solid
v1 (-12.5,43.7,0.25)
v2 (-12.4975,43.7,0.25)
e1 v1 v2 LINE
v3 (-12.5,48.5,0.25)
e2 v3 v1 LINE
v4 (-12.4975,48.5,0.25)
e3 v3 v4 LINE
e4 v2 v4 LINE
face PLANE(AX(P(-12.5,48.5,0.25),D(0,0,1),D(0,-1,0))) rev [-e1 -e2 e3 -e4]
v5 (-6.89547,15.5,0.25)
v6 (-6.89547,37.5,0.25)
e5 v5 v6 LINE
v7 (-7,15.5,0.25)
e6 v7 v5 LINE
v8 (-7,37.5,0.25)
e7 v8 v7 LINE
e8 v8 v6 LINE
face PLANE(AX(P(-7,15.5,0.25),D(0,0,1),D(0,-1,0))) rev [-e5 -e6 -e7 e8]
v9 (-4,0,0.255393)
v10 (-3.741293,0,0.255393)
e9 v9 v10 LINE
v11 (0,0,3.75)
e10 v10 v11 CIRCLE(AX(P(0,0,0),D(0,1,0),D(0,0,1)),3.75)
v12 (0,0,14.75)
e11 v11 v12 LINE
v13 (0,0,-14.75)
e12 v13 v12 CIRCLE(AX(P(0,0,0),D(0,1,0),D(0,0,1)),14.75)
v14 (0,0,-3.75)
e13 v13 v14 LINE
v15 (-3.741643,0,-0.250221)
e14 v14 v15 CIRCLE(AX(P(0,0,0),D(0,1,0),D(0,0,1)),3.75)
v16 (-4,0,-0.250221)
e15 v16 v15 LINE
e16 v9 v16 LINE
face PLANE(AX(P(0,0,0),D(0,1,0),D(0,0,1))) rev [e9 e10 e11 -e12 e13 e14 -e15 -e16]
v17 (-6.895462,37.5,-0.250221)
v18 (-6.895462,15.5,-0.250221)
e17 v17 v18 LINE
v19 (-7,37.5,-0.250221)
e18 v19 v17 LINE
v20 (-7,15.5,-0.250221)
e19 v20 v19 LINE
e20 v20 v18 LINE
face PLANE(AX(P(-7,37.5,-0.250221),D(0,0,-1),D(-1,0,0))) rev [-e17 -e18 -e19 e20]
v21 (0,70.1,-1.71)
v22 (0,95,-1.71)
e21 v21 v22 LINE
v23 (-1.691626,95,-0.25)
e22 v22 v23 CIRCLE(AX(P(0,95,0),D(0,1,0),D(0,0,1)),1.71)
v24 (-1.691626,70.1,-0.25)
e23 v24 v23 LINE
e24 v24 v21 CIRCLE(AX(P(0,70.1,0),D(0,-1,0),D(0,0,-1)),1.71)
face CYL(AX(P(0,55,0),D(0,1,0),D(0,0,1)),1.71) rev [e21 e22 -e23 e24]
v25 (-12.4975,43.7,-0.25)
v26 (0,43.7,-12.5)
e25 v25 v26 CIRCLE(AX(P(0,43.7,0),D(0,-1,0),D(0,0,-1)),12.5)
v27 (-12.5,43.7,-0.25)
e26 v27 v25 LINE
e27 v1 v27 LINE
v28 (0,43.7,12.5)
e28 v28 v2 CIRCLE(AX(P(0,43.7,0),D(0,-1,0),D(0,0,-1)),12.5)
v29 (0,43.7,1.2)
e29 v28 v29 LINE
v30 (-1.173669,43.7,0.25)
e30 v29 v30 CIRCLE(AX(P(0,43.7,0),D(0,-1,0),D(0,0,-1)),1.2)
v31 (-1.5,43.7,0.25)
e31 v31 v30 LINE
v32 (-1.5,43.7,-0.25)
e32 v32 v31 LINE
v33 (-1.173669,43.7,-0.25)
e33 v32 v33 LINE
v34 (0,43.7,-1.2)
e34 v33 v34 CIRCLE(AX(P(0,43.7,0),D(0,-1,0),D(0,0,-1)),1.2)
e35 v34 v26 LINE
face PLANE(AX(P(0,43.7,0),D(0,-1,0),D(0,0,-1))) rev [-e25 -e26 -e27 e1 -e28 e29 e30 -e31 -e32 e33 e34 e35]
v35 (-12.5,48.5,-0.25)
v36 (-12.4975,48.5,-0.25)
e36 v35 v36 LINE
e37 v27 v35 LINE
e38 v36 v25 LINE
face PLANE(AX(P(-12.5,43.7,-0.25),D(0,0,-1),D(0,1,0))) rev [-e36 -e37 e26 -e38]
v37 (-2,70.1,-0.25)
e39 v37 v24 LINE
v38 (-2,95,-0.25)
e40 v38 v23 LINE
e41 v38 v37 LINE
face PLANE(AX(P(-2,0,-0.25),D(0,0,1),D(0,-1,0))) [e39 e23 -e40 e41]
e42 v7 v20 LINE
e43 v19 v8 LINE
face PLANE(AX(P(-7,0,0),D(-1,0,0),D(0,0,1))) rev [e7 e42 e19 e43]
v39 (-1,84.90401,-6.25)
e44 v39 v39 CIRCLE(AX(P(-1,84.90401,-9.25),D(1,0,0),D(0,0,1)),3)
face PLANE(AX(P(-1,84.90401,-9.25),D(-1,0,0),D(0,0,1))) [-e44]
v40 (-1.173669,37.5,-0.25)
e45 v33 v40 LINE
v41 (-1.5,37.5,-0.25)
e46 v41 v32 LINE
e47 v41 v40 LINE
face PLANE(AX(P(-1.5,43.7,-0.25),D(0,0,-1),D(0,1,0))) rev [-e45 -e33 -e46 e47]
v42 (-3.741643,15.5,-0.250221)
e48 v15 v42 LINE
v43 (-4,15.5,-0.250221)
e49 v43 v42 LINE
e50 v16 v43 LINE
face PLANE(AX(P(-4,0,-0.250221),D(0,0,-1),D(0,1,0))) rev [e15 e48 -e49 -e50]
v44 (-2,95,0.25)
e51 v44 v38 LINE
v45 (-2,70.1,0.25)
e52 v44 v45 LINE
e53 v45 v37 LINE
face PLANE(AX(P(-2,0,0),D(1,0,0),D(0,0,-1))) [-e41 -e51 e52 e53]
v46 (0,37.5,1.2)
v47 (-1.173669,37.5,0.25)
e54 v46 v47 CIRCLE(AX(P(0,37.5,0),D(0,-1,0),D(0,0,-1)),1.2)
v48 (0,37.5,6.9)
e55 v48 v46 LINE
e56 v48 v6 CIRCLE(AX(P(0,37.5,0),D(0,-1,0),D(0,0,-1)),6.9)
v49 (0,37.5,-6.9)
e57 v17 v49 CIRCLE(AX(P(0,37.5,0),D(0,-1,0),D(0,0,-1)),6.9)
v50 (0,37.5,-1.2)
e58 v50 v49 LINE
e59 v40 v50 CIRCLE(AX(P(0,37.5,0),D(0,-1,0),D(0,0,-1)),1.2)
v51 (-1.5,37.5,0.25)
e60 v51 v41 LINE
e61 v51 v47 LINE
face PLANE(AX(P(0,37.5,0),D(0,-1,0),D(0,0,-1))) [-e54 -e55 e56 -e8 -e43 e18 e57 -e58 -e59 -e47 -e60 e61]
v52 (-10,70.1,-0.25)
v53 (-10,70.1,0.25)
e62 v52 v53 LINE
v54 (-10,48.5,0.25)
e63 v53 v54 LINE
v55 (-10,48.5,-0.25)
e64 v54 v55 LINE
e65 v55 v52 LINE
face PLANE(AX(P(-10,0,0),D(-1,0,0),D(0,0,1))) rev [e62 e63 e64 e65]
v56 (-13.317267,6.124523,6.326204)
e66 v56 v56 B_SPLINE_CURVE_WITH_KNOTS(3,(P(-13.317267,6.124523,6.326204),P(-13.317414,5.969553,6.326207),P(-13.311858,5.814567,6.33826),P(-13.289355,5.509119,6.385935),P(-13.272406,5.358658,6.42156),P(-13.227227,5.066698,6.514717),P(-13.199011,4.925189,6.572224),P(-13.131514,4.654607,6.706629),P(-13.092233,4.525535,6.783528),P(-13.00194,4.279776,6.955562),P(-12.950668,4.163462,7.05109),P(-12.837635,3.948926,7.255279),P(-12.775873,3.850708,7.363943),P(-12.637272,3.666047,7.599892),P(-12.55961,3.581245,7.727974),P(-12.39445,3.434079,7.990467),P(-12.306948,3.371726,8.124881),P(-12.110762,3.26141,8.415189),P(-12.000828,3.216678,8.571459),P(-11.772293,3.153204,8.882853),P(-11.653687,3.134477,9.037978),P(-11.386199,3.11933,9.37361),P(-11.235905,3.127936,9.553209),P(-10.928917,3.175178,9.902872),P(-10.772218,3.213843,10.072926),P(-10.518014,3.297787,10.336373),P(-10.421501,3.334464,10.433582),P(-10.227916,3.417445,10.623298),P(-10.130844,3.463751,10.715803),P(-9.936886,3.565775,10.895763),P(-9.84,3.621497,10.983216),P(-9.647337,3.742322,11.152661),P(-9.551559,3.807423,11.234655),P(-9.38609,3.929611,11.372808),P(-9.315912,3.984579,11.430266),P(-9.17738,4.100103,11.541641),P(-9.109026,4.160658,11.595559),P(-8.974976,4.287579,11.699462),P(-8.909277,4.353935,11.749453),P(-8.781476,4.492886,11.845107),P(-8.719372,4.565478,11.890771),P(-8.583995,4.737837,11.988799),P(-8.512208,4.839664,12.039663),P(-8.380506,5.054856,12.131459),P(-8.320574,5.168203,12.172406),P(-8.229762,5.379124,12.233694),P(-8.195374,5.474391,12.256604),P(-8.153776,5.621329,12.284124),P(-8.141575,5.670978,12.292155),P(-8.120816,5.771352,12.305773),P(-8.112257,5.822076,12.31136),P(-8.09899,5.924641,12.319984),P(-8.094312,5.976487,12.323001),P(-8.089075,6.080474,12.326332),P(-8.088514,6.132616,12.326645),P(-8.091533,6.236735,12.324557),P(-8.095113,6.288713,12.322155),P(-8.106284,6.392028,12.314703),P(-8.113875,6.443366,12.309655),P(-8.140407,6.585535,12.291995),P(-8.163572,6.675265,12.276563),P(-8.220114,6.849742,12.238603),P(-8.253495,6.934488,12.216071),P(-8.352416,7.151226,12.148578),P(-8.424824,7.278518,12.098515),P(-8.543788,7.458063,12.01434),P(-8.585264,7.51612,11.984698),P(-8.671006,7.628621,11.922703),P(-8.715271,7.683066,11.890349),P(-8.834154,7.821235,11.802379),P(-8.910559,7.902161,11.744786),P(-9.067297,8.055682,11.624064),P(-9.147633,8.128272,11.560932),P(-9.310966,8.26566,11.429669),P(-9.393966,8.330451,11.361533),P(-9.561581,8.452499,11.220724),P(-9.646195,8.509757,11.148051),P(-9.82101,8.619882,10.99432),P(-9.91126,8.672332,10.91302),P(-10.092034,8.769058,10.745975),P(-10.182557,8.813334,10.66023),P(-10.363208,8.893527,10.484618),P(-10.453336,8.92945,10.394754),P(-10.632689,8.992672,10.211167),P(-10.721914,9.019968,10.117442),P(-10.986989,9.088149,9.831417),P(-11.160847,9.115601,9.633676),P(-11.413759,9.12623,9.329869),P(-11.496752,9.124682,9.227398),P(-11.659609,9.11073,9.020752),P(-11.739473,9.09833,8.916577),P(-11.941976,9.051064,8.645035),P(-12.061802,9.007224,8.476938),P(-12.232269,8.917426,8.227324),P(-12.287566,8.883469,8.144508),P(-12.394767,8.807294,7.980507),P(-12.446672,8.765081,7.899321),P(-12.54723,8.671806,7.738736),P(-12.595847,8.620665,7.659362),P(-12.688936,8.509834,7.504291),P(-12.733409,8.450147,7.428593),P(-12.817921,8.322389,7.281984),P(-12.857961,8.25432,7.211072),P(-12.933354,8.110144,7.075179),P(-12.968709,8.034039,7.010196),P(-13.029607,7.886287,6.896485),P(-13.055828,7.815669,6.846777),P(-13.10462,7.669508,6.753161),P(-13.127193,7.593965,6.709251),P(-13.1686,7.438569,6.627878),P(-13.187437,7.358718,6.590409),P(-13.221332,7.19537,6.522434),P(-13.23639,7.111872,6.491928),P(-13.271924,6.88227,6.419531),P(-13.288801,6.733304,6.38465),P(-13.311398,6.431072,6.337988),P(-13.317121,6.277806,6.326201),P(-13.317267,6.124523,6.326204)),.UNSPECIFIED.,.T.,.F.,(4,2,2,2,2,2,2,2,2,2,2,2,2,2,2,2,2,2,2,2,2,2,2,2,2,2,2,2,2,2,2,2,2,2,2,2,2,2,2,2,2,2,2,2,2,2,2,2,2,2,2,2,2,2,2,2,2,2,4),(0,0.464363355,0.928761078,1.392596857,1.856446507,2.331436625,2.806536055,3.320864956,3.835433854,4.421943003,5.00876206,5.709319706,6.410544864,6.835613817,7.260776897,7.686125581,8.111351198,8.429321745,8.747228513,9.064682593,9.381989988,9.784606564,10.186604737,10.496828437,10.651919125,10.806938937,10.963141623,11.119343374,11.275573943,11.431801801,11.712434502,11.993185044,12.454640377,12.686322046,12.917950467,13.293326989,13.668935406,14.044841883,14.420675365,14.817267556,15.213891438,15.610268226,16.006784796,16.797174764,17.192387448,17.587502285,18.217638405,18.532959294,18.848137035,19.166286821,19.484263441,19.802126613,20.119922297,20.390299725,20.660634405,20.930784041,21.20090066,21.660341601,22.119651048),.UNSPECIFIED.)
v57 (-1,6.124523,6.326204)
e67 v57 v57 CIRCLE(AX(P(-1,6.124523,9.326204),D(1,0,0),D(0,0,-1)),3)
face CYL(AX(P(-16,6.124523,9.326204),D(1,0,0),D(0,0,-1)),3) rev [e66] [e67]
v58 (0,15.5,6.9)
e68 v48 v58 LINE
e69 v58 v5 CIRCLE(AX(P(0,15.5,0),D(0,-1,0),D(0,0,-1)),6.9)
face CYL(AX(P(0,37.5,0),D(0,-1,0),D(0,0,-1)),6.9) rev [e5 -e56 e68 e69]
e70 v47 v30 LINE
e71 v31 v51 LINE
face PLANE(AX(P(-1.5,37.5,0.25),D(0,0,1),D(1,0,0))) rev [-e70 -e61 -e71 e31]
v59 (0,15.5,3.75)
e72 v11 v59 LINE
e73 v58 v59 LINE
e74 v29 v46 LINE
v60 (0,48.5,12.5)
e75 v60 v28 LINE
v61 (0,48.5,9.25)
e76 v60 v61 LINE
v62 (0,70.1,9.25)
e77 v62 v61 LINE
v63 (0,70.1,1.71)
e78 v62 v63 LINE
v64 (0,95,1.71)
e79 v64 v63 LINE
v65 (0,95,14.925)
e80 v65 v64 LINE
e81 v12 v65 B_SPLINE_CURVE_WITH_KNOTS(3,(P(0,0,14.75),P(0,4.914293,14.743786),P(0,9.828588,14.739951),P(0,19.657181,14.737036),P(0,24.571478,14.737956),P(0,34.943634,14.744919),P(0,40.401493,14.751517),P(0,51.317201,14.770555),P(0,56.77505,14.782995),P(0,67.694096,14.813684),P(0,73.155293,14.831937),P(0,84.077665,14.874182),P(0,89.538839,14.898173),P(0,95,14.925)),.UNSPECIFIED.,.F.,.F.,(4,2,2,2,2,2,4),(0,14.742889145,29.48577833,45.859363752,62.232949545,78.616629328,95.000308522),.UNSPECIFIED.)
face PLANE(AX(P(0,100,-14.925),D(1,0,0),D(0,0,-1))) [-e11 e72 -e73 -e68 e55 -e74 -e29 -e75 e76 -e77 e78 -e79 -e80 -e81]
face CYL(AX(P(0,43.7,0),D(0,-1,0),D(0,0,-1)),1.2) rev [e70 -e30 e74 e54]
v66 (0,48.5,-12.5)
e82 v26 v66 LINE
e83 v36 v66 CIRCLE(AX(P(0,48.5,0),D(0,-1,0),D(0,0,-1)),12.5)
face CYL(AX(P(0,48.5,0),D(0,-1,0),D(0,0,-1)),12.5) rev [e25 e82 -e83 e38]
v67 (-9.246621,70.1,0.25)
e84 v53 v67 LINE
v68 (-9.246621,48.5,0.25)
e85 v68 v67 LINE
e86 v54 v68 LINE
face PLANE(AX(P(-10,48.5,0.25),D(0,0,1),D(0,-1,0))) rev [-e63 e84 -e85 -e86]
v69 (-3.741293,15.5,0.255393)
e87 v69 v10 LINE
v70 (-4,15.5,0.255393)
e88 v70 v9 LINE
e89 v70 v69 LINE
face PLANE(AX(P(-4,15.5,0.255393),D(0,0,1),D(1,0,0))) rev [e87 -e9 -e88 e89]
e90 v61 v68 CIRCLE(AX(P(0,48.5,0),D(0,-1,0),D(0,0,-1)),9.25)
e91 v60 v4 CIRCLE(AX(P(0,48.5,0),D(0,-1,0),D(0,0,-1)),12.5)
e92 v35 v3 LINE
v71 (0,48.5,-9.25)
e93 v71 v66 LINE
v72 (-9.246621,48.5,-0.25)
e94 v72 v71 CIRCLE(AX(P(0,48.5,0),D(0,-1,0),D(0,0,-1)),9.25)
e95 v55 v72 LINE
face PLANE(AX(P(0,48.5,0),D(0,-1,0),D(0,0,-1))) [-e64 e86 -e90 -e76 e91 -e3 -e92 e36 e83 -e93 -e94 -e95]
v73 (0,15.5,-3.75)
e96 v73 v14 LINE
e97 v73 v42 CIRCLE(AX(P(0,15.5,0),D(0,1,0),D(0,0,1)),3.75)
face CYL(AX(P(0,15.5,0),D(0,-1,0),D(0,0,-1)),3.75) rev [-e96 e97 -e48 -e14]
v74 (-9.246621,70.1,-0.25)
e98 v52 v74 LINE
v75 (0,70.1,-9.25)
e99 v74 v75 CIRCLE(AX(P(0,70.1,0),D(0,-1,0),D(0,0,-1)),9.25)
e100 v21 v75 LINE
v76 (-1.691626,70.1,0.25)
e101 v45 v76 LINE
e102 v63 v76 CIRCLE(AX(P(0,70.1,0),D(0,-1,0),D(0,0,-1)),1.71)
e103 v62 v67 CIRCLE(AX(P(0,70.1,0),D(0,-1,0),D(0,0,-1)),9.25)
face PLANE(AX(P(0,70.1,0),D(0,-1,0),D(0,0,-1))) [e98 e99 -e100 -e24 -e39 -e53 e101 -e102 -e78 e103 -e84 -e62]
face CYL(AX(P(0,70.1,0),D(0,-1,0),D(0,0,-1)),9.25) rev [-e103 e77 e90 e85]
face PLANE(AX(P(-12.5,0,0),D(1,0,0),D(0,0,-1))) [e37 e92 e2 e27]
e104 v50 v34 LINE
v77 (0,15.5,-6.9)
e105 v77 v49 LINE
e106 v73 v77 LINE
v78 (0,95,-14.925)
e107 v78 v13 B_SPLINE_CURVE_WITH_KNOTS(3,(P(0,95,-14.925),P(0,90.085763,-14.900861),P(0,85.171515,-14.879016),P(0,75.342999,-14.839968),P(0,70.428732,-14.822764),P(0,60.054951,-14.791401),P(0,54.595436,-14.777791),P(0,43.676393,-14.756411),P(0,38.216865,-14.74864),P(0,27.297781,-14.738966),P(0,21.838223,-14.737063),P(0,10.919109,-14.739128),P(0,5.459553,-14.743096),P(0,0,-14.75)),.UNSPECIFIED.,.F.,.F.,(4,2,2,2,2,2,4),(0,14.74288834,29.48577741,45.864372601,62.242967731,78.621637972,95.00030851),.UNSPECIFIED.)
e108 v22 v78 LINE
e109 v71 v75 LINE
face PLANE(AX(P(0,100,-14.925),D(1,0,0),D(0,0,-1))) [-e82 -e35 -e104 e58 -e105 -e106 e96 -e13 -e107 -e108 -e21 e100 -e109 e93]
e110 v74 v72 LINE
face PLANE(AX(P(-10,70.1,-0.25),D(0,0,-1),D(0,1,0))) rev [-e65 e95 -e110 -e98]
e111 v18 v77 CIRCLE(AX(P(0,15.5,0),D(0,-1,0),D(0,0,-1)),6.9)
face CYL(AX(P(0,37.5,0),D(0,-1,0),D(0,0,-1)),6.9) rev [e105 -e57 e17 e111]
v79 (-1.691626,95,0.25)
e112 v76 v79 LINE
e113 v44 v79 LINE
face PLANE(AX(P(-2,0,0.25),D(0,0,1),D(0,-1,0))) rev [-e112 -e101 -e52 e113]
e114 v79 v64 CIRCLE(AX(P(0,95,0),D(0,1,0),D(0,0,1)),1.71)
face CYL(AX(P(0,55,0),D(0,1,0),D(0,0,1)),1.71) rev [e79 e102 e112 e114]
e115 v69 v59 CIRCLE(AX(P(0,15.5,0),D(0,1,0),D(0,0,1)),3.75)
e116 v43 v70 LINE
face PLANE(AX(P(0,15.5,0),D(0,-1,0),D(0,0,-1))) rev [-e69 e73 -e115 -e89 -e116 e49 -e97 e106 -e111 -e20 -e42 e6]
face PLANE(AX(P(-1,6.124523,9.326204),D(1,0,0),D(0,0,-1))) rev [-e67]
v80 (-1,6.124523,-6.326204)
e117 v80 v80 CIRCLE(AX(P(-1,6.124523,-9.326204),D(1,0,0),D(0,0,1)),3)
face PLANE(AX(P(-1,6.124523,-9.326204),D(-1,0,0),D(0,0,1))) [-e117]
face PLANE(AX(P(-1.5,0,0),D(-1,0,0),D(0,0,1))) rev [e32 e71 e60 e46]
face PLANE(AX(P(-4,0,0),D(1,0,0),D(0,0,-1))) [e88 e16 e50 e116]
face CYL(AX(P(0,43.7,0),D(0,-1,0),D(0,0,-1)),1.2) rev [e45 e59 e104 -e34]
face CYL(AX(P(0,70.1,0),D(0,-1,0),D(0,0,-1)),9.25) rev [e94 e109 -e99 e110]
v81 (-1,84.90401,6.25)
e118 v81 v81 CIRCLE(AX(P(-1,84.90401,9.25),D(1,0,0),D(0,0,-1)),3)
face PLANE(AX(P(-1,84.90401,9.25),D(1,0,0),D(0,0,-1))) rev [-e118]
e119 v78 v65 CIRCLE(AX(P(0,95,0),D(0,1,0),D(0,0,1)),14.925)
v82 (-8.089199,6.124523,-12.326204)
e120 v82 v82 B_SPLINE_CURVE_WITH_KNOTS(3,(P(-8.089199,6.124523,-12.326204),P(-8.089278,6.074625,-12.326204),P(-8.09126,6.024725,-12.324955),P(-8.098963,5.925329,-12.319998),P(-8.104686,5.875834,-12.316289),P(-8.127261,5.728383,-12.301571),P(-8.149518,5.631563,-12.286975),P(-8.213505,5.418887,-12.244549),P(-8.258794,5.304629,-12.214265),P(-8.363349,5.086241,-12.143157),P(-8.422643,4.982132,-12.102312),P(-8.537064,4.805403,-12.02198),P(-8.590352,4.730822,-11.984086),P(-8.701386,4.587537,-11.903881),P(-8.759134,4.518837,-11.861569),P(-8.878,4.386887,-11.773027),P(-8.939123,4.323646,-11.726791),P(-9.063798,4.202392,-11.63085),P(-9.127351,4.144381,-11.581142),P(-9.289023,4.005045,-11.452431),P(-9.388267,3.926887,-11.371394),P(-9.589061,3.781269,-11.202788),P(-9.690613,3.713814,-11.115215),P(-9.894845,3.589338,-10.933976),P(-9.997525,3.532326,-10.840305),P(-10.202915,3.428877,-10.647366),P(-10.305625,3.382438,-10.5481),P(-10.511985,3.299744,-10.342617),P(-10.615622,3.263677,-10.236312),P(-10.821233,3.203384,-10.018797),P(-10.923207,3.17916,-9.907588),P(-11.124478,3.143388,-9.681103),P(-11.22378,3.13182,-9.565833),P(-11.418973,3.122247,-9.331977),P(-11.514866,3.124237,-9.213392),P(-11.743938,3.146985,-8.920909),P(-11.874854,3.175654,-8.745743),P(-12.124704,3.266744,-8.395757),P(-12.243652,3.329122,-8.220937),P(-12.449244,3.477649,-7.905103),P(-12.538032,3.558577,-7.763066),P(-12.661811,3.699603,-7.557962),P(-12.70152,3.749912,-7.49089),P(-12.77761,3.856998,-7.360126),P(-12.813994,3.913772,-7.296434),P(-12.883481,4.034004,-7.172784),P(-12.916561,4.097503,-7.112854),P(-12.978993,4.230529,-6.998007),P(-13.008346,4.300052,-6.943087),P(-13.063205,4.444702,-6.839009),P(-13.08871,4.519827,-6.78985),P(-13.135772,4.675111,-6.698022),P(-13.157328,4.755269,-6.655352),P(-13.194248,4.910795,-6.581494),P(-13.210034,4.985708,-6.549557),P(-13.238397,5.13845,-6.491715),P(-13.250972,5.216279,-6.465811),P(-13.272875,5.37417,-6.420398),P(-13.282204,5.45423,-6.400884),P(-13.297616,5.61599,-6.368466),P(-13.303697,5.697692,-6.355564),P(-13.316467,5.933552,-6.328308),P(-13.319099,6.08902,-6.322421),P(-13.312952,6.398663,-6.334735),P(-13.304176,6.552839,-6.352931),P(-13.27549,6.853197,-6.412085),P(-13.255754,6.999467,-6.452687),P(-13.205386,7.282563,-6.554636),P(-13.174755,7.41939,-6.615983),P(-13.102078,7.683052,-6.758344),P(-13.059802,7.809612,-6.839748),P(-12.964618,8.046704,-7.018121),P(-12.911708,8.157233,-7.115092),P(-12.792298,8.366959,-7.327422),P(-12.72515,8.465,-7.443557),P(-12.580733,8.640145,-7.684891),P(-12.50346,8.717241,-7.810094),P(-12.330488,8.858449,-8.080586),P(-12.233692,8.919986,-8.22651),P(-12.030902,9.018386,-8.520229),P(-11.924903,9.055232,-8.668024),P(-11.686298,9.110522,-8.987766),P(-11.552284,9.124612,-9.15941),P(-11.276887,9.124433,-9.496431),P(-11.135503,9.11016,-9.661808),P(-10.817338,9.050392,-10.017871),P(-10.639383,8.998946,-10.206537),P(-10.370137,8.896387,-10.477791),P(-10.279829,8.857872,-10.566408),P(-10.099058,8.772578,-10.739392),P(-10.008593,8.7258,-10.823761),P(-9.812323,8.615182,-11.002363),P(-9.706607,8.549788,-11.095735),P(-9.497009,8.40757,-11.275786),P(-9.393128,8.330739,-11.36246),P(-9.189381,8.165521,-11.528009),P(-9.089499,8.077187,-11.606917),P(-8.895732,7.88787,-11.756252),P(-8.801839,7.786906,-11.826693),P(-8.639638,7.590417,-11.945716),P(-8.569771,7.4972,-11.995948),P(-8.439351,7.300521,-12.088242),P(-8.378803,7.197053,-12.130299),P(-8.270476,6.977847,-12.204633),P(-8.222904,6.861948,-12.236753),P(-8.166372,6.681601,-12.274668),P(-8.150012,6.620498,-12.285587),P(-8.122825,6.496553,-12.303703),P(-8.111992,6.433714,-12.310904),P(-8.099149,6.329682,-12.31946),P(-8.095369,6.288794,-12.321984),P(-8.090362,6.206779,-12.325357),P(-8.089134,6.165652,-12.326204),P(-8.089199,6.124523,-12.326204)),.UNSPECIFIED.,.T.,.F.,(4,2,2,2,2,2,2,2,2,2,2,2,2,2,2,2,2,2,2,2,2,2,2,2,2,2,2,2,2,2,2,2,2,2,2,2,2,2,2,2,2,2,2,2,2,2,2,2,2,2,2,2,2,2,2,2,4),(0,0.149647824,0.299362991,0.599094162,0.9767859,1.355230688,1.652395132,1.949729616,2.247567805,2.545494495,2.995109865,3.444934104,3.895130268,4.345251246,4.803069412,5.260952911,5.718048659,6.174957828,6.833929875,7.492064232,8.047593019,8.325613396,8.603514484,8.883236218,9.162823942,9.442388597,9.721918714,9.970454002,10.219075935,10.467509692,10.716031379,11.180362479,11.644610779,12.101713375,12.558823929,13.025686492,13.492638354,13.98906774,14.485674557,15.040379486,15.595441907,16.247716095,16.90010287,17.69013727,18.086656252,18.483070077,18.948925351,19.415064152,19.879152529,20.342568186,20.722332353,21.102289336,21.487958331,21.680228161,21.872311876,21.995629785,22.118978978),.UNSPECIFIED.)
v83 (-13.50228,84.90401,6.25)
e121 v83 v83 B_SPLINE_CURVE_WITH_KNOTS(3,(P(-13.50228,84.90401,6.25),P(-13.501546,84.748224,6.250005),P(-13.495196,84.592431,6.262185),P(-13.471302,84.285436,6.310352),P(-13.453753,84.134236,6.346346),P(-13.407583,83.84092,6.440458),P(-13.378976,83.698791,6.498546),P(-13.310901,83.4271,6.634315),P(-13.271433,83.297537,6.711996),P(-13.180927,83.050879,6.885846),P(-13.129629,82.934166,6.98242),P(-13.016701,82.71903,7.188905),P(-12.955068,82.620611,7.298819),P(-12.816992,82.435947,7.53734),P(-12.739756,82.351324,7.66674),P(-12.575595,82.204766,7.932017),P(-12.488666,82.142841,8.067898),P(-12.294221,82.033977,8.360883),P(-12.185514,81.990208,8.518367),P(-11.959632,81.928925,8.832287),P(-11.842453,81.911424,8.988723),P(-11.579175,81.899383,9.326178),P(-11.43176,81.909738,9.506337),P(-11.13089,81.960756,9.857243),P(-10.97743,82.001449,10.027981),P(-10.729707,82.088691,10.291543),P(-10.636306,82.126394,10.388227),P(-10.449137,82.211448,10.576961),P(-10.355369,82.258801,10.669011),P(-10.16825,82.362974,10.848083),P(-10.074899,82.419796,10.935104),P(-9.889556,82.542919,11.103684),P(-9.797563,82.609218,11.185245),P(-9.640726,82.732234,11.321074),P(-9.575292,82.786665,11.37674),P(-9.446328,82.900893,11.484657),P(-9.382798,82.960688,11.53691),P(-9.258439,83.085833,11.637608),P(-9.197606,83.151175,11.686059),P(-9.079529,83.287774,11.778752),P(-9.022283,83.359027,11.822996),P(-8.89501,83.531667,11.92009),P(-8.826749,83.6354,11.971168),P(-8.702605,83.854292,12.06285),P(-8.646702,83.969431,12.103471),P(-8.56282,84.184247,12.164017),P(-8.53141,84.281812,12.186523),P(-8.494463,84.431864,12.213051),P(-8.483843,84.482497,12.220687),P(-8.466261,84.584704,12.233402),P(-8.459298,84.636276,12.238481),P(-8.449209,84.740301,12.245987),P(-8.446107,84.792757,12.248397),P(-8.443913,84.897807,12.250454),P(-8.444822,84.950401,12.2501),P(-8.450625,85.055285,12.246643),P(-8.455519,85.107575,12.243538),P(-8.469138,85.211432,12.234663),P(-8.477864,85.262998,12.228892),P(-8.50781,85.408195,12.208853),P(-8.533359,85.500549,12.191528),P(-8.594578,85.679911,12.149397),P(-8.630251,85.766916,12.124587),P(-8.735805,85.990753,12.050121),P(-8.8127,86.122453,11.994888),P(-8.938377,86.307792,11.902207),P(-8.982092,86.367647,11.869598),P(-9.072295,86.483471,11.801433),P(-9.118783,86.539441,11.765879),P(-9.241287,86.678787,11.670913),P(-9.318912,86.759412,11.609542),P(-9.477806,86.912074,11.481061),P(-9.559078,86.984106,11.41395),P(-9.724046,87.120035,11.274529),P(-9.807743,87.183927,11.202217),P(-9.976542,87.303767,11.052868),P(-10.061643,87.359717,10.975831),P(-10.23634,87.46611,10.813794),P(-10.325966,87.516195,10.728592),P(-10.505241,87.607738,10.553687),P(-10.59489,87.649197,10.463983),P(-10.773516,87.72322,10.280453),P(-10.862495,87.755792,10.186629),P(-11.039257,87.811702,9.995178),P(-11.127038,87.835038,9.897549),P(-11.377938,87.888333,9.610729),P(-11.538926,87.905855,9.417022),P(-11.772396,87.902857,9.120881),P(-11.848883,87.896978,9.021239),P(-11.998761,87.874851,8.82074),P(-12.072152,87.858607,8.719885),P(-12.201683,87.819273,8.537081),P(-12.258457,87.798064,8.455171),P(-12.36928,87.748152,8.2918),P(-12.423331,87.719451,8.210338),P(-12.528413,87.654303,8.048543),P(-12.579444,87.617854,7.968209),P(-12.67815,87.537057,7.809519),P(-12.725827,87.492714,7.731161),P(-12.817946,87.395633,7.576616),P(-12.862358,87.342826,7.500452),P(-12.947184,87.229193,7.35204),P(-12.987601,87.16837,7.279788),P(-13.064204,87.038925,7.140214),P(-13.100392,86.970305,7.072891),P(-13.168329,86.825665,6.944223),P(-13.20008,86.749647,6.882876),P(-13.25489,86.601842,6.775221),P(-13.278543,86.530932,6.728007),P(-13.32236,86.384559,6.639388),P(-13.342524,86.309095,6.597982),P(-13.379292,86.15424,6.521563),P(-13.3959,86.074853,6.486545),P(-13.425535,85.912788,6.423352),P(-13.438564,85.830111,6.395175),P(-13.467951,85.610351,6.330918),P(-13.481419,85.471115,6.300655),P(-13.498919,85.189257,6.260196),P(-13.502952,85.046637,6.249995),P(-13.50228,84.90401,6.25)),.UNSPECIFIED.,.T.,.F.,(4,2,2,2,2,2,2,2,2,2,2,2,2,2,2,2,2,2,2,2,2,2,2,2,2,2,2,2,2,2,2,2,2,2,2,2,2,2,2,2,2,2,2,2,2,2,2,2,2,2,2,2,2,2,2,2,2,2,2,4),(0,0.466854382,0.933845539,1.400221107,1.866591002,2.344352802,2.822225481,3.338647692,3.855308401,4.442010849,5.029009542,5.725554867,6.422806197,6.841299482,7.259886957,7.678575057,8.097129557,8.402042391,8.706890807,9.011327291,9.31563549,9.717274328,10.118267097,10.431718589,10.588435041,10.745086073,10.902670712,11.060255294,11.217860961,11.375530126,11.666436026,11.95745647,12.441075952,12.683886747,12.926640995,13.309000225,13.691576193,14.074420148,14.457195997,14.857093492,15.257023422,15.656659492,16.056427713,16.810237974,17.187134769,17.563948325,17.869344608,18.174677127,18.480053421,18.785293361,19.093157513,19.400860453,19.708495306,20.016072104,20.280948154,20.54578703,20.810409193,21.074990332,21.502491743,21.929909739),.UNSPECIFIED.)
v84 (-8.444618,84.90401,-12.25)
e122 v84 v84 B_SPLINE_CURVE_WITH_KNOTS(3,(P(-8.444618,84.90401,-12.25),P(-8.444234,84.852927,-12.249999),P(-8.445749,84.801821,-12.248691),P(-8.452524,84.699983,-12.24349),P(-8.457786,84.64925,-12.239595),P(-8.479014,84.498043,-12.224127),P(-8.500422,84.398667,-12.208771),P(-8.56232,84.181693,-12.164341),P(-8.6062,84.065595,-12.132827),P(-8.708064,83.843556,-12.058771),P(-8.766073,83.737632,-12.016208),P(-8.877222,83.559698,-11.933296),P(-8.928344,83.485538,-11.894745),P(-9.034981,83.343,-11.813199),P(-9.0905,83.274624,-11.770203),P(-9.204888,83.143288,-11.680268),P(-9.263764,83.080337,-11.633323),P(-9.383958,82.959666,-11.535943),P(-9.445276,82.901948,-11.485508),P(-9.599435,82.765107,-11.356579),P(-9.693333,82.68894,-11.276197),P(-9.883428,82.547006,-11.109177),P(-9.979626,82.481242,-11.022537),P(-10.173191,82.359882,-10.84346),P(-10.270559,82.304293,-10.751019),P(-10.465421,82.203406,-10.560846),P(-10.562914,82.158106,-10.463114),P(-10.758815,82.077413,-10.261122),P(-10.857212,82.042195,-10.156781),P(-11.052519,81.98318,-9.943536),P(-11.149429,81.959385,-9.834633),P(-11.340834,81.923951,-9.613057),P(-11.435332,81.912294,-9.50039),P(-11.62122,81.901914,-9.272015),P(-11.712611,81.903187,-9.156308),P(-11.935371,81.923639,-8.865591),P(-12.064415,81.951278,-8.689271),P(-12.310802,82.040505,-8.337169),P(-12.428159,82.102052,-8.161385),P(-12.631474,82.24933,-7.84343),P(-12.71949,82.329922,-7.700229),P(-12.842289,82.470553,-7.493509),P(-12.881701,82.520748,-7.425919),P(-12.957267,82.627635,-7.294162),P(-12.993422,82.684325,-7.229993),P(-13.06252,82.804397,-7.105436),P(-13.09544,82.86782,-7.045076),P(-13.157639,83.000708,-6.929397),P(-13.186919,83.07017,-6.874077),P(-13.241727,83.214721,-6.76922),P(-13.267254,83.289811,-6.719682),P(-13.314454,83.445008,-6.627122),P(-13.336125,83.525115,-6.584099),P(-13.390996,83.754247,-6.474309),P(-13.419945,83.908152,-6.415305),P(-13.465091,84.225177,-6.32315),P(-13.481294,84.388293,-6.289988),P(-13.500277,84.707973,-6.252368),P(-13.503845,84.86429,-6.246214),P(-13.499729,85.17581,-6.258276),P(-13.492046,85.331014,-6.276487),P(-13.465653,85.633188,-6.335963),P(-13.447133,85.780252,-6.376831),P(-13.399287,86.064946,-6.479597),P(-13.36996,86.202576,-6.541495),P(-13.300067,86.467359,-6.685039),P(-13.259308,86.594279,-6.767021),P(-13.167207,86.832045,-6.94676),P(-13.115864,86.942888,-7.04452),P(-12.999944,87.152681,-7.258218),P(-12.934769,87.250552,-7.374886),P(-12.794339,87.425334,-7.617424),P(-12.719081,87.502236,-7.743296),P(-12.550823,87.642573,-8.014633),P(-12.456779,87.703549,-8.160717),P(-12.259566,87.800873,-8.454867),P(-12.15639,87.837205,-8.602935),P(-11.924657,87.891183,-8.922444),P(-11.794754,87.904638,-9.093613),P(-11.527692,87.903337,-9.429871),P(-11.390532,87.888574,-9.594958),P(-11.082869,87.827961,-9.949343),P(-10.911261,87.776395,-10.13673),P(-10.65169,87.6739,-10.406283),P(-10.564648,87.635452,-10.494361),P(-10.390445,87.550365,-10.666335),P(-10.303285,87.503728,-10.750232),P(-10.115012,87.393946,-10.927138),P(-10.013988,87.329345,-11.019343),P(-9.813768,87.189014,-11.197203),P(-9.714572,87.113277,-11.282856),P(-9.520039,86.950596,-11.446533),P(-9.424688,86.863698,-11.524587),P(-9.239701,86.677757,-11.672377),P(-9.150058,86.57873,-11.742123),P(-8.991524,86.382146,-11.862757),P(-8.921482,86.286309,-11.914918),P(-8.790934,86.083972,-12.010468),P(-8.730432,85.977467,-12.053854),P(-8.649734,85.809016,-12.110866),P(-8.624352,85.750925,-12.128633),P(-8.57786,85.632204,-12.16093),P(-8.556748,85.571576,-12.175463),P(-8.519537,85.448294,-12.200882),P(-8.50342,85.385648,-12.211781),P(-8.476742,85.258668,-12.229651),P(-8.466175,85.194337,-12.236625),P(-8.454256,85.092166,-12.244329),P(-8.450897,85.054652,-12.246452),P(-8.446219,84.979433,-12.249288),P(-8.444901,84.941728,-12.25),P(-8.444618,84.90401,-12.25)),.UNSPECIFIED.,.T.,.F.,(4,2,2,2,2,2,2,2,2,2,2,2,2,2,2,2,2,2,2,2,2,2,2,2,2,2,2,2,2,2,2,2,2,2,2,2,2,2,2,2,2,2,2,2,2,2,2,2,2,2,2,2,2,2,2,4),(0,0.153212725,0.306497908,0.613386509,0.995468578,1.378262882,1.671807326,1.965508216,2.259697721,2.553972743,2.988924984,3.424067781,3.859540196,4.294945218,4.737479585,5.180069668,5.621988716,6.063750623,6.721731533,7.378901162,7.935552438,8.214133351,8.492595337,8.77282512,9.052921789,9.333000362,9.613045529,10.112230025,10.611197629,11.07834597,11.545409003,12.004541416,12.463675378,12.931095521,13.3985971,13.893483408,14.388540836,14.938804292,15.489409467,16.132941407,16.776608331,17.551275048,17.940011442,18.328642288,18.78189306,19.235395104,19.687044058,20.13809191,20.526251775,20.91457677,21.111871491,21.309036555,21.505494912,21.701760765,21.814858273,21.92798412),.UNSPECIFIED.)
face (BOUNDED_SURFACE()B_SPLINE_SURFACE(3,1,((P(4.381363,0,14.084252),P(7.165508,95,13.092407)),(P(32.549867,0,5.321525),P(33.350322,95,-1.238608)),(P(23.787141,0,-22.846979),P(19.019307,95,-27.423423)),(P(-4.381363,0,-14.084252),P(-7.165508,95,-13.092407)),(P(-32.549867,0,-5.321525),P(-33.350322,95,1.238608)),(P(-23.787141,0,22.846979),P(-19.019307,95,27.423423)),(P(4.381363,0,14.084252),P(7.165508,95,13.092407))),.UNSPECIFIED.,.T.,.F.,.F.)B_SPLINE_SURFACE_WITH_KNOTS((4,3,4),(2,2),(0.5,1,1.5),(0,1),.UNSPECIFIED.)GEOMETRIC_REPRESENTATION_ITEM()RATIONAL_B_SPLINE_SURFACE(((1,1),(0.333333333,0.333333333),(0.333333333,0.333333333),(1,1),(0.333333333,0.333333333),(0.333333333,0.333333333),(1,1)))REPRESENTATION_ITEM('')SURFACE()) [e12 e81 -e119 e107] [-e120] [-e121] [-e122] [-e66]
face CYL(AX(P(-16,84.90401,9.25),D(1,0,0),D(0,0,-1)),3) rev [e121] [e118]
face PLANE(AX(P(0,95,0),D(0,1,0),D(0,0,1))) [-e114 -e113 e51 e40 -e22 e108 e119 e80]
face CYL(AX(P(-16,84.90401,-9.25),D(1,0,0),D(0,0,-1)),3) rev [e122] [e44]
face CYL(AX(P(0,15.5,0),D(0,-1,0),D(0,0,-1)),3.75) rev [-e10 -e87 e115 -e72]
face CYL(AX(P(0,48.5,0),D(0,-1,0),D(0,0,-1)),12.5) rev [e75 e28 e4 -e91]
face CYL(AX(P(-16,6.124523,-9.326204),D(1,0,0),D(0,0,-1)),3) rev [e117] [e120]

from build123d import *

# Parameters (mm, degrees)
SKETCH3_W           = 21.993363762
SKETCH3_H           = 30.202832843
CUT_EXTRUDE1_DEPTH  = 100
SKETCH5_R           = 3.75
CUT_EXTRUDE4_DEPTH  = 15.5
SKETCH6_R           = 6.9
CUT_EXTRUDE5_DEPTH  = 22
SKETCH7_R           = 1.2
CUT_EXTRUDE6_DEPTH  = 6.2
SKETCH8_R           = 12.5
CUT_EXTRUDE7_DEPTH  = 4.8
SKETCH9_R           = 9.25
CUT_EXTRUDE8_DEPTH  = 21.6
SKETCH10_R          = 1.71
CUT_EXTRUDE9_DEPTH  = 40
SKETCH12_W          = 0.5
SKETCH12_H          = 24.9
CUT_EXTRUDE10_DEPTH = 2
SKETCH13_W          = 0.5
SKETCH13_H          = 21.6
CUT_EXTRUDE11_DEPTH = 10
SKETCH14_W          = 0.5
SKETCH14_H          = 4.8
CUT_EXTRUDE12_DEPTH = 12.5
SKETCH15_W          = 0.5
SKETCH15_H          = 6.2
CUT_EXTRUDE13_DEPTH = 1.5
SKETCH16_W          = 0.500221157
SKETCH16_H          = 22
CUT_EXTRUDE14_DEPTH = 7
SKETCH17_W          = 0.505614017
SKETCH17_H          = 15.5
CUT_EXTRUDE15_DEPTH = 4
CUT_EXTRUDE16_START = -1
SKETCH18_R          = 3
CUT_EXTRUDE16_DEPTH = 15


with BuildPart() as part:
    # Loft1: read off the stored shape, not the designer's step
    # Loft1: loft between two sections, ruled curve by curve
    loft1_from = [
        Edge.make_bspline([(-4.381363328, 0, -14.084252035), (-32.549867398, 0, -5.321525378), (-23.787140742, 0, 22.846978692), (4.381363328, 0, 14.084252035), (32.549867398, 0, 5.321525378), (23.787140742, 0, -22.846978692), (-4.381363328, 0, -14.084252035)], [0, 0, 0, 0, 0.5, 0.5, 0.5, 1, 1, 1, 1], 3, [1, 0.333333333, 0.333333333, 1, 0.333333333, 0.333333333, 1]),
    ]
    loft1_to = [
        Edge.make_bspline([(-7.165507724, 95, -13.092407115), (-33.350321953, 95, 1.238608334), (-19.019306505, 95, 27.423422563), (7.165507724, 95, 13.092407115), (33.350321953, 95, -1.238608334), (19.019306505, 95, -27.423422563), (-7.165507724, 95, -13.092407115)], [0, 0, 0, 0, 0.5, 0.5, 0.5, 1, 1, 1, 1], 3, [1, 0.333333333, 0.333333333, 1, 0.333333333, 0.333333333, 1]),
    ]
    loft1 = Solid(Shell([*[Face.make_surface_from_curves(loft1_from[k], loft1_to[k]) for k in range(1)], Face(Wire(loft1_from)), Face(Wire(loft1_to))]))
    add(loft1)

    # Sketch3 → Cut-Extrude1 (cut)
    with BuildSketch(Plane(origin=(0, 0, 0), x_dir=(1, 0, 0), z_dir=(0, 1, 0))):
        with Locations((10.996681881, -0.176416421)):
            Rectangle(SKETCH3_W, SKETCH3_H)
    extrude(amount=CUT_EXTRUDE1_DEPTH, mode=Mode.SUBTRACT)

    # Sketch5 → Cut-Extrude4 (cut)
    with BuildSketch(Plane(origin=(0, 0, 0), x_dir=(1, 0, 0), z_dir=(0, 1, 0))):
        Circle(SKETCH5_R)
    extrude(amount=CUT_EXTRUDE4_DEPTH, mode=Mode.SUBTRACT)

    # Sketch6 → Cut-Extrude5 (cut)
    with BuildSketch(Plane(origin=(0, 15.5, 0), x_dir=(-1, 0, 0), z_dir=(0, -1, 0))):
        Circle(SKETCH6_R)
    extrude(amount=-CUT_EXTRUDE5_DEPTH, mode=Mode.SUBTRACT)

    # Sketch7 → Cut-Extrude6 (cut)
    with BuildSketch(Plane(origin=(0, 37.5, 0), x_dir=(-1, 0, 0), z_dir=(0, -1, 0))):
        Circle(SKETCH7_R)
    extrude(amount=-CUT_EXTRUDE6_DEPTH, mode=Mode.SUBTRACT)

    # Sketch8 → Cut-Extrude7 (cut)
    with BuildSketch(Plane(origin=(0, 43.7, 0), x_dir=(-1, 0, 0), z_dir=(0, -1, 0))):
        Circle(SKETCH8_R)
    extrude(amount=-CUT_EXTRUDE7_DEPTH, mode=Mode.SUBTRACT)

    # Sketch9 → Cut-Extrude8 (cut)
    with BuildSketch(Plane(origin=(0, 48.5, 0), x_dir=(-1, 0, 0), z_dir=(0, -1, 0))):
        Circle(SKETCH9_R)
    extrude(amount=-CUT_EXTRUDE8_DEPTH, mode=Mode.SUBTRACT)

    # Sketch10 → Cut-Extrude9 (cut)
    with BuildSketch(Plane(origin=(0, 95, 0), x_dir=(1, 0, 0), z_dir=(0, 1, 0))):
        Circle(SKETCH10_R)
    extrude(amount=-CUT_EXTRUDE9_DEPTH, mode=Mode.SUBTRACT)

    # Sketch12 → Cut-Extrude10 (cut)
    with BuildSketch(Plane(origin=(0, 0, 0), x_dir=(0, 0, -1), z_dir=(1, 0, 0))):
        with Locations((0, 82.55)):
            Rectangle(SKETCH12_W, SKETCH12_H)
    extrude(amount=-CUT_EXTRUDE10_DEPTH, mode=Mode.SUBTRACT)

    # Sketch13 → Cut-Extrude11 (cut)
    with BuildSketch(Plane(origin=(0, 0, 0), x_dir=(0, 0, -1), z_dir=(1, 0, 0))):
        with Locations((0, 59.3)):
            Rectangle(SKETCH13_W, SKETCH13_H)
    extrude(amount=-CUT_EXTRUDE11_DEPTH, mode=Mode.SUBTRACT)

    # Sketch14 → Cut-Extrude12 (cut)
    with BuildSketch(Plane(origin=(0, 0, 0), x_dir=(0, 0, -1), z_dir=(1, 0, 0))):
        with Locations((0, 46.1)):
            Rectangle(SKETCH14_W, SKETCH14_H)
    extrude(amount=-CUT_EXTRUDE12_DEPTH, mode=Mode.SUBTRACT)

    # Sketch15 → Cut-Extrude13 (cut)
    with BuildSketch(Plane(origin=(0, 0, 0), x_dir=(0, 0, -1), z_dir=(1, 0, 0))):
        with Locations((0, 40.6)):
            Rectangle(SKETCH15_W, SKETCH15_H)
    extrude(amount=-CUT_EXTRUDE13_DEPTH, mode=Mode.SUBTRACT)

    # Sketch16 → Cut-Extrude14 (cut)
    with BuildSketch(Plane(origin=(0, 0, 0), x_dir=(0, 0, -1), z_dir=(1, 0, 0))):
        with Locations((0.000110579, 26.5)):
            Rectangle(SKETCH16_W, SKETCH16_H)
    extrude(amount=-CUT_EXTRUDE14_DEPTH, mode=Mode.SUBTRACT)

    # Sketch17 → Cut-Extrude15 (cut)
    with BuildSketch(Plane(origin=(0, 0, 0), x_dir=(0, 0, -1), z_dir=(1, 0, 0))):
        with Locations((-0.002585851, 7.75)):
            Rectangle(SKETCH17_W, SKETCH17_H)
    extrude(amount=-CUT_EXTRUDE15_DEPTH, mode=Mode.SUBTRACT)

    # Sketch18 → Cut-Extrude16 (cut)
    with BuildSketch(Plane(origin=(0, 0, 0), x_dir=(0, 0, -1), z_dir=(1, 0, 0)).offset(CUT_EXTRUDE16_START)):
        with Locations((-9.326204078, 6.12452291)):
            Circle(SKETCH18_R)
        with Locations((-9.25, 84.904010386)):
            Circle(SKETCH18_R)
        with Locations((9.326204078, 6.12452291)):
            Circle(SKETCH18_R)
        with Locations((9.25, 84.904010386)):
            Circle(SKETCH18_R)
    extrude(amount=-CUT_EXTRUDE16_DEPTH, mode=Mode.SUBTRACT)


solid = part.part
